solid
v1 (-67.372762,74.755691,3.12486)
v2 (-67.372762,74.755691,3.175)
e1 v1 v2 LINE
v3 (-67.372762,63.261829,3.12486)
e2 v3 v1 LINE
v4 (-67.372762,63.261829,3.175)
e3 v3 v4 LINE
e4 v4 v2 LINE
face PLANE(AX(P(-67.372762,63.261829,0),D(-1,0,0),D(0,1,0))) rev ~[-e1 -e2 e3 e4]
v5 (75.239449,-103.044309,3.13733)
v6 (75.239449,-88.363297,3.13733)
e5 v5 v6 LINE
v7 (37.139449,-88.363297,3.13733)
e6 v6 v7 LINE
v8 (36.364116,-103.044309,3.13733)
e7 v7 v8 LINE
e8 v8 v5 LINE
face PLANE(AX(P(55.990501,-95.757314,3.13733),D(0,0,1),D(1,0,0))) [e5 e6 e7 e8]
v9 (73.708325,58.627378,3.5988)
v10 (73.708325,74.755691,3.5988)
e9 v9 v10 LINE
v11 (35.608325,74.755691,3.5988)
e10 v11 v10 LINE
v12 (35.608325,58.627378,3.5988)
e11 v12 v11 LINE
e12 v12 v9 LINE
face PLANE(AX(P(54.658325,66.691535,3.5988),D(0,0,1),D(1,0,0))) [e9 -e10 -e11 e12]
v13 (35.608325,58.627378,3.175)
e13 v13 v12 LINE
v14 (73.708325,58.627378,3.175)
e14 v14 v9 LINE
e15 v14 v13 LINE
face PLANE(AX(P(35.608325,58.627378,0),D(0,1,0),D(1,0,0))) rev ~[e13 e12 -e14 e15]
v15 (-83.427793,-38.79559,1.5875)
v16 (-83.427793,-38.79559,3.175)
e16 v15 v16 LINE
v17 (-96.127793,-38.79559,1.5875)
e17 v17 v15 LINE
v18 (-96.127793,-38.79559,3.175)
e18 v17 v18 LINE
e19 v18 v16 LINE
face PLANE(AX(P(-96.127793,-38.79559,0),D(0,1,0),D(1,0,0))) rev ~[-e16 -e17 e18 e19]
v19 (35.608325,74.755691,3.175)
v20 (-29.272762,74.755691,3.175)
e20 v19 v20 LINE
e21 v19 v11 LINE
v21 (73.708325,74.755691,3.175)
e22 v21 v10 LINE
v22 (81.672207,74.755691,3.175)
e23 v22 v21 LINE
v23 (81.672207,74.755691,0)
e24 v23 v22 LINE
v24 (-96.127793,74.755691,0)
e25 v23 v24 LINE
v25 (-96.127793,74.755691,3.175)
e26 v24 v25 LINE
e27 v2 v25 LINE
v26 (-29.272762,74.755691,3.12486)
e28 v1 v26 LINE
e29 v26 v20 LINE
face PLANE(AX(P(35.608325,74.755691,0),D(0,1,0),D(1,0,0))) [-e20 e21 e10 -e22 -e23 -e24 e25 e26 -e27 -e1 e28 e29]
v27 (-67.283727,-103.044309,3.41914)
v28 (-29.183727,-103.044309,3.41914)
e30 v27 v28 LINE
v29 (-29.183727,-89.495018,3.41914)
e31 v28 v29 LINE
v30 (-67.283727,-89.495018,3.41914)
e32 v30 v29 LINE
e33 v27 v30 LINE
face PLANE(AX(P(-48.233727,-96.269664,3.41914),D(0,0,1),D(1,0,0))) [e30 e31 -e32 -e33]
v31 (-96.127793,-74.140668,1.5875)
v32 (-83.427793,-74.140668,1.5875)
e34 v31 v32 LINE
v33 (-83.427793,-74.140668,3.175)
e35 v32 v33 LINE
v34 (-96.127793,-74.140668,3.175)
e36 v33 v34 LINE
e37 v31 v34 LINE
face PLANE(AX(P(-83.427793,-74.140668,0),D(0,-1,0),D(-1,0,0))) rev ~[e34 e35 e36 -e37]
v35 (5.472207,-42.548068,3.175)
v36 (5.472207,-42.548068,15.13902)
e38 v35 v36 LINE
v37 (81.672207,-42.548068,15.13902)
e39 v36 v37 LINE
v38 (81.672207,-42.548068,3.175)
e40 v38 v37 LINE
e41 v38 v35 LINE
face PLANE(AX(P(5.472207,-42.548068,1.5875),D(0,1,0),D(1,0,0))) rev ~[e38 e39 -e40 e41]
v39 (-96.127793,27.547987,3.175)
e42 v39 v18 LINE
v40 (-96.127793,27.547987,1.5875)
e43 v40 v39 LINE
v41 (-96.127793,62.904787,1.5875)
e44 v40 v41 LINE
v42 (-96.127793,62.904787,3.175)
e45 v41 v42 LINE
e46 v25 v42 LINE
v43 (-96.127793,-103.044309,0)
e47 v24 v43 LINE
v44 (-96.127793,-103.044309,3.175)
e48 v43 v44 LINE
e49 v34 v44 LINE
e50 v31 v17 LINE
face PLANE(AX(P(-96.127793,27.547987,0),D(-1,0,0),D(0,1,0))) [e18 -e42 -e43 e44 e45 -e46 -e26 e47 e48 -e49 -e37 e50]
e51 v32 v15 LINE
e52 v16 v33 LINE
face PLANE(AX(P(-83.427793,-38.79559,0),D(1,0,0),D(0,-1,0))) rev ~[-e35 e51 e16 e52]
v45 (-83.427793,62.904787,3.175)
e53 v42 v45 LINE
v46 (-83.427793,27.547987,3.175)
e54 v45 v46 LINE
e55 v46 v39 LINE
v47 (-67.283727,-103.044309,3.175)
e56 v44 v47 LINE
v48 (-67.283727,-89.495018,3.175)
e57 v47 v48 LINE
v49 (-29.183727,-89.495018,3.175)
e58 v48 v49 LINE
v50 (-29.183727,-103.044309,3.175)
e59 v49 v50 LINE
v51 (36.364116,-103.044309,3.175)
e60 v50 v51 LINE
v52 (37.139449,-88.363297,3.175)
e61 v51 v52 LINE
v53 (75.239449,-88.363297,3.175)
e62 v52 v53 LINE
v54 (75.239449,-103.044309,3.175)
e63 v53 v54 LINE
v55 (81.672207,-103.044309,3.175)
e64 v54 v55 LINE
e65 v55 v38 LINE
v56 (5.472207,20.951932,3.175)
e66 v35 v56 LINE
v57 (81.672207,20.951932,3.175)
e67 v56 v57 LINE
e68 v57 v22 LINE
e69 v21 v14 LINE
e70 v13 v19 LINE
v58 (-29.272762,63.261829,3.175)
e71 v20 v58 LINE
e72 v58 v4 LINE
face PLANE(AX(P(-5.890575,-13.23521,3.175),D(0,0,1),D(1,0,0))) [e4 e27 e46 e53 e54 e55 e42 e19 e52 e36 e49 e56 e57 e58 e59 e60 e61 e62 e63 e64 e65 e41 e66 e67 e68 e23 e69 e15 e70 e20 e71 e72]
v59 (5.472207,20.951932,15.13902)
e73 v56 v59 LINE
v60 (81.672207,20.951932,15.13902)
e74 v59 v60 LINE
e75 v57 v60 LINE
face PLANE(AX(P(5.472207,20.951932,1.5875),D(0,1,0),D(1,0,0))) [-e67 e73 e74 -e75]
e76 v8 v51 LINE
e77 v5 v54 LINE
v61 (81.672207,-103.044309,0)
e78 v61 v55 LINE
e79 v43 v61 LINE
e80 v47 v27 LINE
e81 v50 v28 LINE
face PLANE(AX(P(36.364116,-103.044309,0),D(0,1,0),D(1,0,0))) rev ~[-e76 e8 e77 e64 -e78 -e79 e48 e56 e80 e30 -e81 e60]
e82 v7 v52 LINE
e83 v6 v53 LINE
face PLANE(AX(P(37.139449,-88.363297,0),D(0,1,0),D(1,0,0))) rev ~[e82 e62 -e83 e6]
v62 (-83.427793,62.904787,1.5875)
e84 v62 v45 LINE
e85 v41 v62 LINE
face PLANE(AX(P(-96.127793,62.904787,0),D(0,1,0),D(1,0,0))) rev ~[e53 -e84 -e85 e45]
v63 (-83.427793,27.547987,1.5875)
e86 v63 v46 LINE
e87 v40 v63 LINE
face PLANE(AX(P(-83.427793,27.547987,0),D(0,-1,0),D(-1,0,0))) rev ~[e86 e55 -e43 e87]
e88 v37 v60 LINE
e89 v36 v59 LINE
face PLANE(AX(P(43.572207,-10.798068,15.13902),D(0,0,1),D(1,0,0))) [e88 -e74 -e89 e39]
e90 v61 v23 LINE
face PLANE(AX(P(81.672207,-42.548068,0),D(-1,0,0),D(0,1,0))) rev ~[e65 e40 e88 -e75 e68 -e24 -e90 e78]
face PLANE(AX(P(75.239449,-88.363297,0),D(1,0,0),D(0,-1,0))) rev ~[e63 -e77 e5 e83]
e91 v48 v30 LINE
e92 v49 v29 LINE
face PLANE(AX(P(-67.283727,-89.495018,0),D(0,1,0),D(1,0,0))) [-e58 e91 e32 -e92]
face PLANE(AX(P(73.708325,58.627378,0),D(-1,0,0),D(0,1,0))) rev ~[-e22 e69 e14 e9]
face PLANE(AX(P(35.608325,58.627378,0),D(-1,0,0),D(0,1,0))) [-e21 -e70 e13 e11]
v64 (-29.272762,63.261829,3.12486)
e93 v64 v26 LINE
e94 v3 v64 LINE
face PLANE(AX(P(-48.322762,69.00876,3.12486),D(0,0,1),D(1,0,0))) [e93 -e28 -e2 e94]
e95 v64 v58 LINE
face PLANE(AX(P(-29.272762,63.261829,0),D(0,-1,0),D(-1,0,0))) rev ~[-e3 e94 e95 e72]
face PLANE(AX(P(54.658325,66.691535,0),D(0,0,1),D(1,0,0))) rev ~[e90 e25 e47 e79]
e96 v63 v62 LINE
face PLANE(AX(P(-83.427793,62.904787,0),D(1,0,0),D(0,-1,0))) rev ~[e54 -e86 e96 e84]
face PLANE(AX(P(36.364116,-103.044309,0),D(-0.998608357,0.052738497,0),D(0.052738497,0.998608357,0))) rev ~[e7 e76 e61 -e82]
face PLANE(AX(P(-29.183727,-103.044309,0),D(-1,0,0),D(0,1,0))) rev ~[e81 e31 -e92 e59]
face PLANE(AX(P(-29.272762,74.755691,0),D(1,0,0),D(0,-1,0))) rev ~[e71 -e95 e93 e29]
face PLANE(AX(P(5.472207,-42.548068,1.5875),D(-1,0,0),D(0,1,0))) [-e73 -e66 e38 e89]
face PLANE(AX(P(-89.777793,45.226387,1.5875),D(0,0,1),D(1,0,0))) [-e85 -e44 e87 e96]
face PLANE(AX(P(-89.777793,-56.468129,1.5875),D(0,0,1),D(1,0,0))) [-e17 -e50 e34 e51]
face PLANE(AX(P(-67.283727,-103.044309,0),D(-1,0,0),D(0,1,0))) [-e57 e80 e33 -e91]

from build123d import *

# Parameters (mm, degrees)
F1_DEPTH = 3.175
F0_W     = 12.7
F0_H     = 35.3568
F0_H_2   = 35.3450775146
F2_DEPTH = 1.5875
F0_W_2   = 76.2
F0_H_3   = 63.5
F3_DEPTH = 1.5875
F0_W_3   = 38.1
F0_H_4   = 13.5492910243
F4_DEPTH = 3.41914
F5_DEPTH = 3.13733
F0_H_5   = 11.4938615345
F6_DEPTH = 3.12486
F0_H_6   = 16.1283126556
F7_DEPTH = 3.5988
F8_DEPTH = 13.55152


with BuildPart() as f1:
    # F0 (on Top) → F1 (new body)
    with BuildSketch(Plane.XY):
        Polygon((-67.3727616668, 74.7556908511), (-96.1277933359, 74.7556908511), (-96.1277933359, 62.904787178), (-83.4277933359, 62.904787178), (-83.4277933359, 27.547987178), (-96.1277933359, 27.547987178), (-96.1277933359, -38.7955904007), (-83.4277933359, -38.7955904007), (-83.4277933359, -74.1406679153), (-96.1277933359, -74.1406679153), (-96.1277933359, -103.0443091489), (-67.2837272286, -103.0443091489), (-67.2837272286, -89.4950181246), (-29.1837272286, -89.4950181246), (-29.1837272286, -103.0443091489), (36.3641157746, -103.0443091489), (37.1394492686, -88.3632972836), (75.2394492686, -88.3632972836), (75.2394492686, -103.0443091489), (81.6722066641, -103.0443091489), (81.6722066641, -42.5480678678), (5.4722066641, -42.5480678678), (5.4722066641, 20.9519321322), (81.6722066641, 20.9519321322), (81.6722066641, 74.7556908511), (73.7083251536, 74.7556908511), (73.7083251536, 58.6273781955), (35.6083251536, 58.6273781955), (35.6083251536, 74.7556908511), (-29.2727616668, 74.7556908511), (-29.2727616668, 63.2618293166), (-67.3727616668, 63.2618293166), align=None)
    extrude(amount=F1_DEPTH)

    # F0 (on Top) → F2 (join)
    with BuildSketch(Plane.XY):
        with Locations((-89.7777933359, 45.226387178)):
            Rectangle(F0_W, F0_H)
        with Locations((-89.7777933359, -56.468129158)):
            Rectangle(F0_W, F0_H_2)
    extrude(amount=F2_DEPTH)

    # F0 (on Top) → F3 (join)
    with BuildSketch(Plane.XY):
        with Locations((43.5722066641, -10.7980678678)):
            Rectangle(F0_W_2, F0_H_3)
    extrude(amount=F3_DEPTH)

    # F0 (on Top) → F4 (join)
    with BuildSketch(Plane.XY):
        with Locations((-48.2337272286, -96.2696636367)):
            Rectangle(F0_W_3, F0_H_4)
    extrude(amount=F4_DEPTH)

    # F0 (on Top) → F5 (join)
    with BuildSketch(Plane.XY):
        Polygon((37.1394492686, -88.3632972836), (36.3641157746, -103.0443091489), (75.2394492686, -103.0443091489), (75.2394492686, -88.3632972836), align=None)
    extrude(amount=F5_DEPTH)

    # F0 (on Top) → F6 (join)
    with BuildSketch(Plane.XY):
        with Locations((-48.3227616668, 69.0087600839)):
            Rectangle(F0_W_3, F0_H_5)
    extrude(amount=F6_DEPTH)

    # F0 (on Top) → F7 (join)
    with BuildSketch(Plane.XY):
        with Locations((54.6583251536, 66.6915345233)):
            Rectangle(F0_W_3, F0_H_6)
    extrude(amount=F7_DEPTH)

    # F8 (add): a face of the model
    f8_faces = [f1.faces().sort_by_distance(p)[0] for p in [
        (43.5722066641, -10.7980678678, 1.5875),
    ]]
    extrude(f8_faces, amount=F8_DEPTH)


solid = f1.part
